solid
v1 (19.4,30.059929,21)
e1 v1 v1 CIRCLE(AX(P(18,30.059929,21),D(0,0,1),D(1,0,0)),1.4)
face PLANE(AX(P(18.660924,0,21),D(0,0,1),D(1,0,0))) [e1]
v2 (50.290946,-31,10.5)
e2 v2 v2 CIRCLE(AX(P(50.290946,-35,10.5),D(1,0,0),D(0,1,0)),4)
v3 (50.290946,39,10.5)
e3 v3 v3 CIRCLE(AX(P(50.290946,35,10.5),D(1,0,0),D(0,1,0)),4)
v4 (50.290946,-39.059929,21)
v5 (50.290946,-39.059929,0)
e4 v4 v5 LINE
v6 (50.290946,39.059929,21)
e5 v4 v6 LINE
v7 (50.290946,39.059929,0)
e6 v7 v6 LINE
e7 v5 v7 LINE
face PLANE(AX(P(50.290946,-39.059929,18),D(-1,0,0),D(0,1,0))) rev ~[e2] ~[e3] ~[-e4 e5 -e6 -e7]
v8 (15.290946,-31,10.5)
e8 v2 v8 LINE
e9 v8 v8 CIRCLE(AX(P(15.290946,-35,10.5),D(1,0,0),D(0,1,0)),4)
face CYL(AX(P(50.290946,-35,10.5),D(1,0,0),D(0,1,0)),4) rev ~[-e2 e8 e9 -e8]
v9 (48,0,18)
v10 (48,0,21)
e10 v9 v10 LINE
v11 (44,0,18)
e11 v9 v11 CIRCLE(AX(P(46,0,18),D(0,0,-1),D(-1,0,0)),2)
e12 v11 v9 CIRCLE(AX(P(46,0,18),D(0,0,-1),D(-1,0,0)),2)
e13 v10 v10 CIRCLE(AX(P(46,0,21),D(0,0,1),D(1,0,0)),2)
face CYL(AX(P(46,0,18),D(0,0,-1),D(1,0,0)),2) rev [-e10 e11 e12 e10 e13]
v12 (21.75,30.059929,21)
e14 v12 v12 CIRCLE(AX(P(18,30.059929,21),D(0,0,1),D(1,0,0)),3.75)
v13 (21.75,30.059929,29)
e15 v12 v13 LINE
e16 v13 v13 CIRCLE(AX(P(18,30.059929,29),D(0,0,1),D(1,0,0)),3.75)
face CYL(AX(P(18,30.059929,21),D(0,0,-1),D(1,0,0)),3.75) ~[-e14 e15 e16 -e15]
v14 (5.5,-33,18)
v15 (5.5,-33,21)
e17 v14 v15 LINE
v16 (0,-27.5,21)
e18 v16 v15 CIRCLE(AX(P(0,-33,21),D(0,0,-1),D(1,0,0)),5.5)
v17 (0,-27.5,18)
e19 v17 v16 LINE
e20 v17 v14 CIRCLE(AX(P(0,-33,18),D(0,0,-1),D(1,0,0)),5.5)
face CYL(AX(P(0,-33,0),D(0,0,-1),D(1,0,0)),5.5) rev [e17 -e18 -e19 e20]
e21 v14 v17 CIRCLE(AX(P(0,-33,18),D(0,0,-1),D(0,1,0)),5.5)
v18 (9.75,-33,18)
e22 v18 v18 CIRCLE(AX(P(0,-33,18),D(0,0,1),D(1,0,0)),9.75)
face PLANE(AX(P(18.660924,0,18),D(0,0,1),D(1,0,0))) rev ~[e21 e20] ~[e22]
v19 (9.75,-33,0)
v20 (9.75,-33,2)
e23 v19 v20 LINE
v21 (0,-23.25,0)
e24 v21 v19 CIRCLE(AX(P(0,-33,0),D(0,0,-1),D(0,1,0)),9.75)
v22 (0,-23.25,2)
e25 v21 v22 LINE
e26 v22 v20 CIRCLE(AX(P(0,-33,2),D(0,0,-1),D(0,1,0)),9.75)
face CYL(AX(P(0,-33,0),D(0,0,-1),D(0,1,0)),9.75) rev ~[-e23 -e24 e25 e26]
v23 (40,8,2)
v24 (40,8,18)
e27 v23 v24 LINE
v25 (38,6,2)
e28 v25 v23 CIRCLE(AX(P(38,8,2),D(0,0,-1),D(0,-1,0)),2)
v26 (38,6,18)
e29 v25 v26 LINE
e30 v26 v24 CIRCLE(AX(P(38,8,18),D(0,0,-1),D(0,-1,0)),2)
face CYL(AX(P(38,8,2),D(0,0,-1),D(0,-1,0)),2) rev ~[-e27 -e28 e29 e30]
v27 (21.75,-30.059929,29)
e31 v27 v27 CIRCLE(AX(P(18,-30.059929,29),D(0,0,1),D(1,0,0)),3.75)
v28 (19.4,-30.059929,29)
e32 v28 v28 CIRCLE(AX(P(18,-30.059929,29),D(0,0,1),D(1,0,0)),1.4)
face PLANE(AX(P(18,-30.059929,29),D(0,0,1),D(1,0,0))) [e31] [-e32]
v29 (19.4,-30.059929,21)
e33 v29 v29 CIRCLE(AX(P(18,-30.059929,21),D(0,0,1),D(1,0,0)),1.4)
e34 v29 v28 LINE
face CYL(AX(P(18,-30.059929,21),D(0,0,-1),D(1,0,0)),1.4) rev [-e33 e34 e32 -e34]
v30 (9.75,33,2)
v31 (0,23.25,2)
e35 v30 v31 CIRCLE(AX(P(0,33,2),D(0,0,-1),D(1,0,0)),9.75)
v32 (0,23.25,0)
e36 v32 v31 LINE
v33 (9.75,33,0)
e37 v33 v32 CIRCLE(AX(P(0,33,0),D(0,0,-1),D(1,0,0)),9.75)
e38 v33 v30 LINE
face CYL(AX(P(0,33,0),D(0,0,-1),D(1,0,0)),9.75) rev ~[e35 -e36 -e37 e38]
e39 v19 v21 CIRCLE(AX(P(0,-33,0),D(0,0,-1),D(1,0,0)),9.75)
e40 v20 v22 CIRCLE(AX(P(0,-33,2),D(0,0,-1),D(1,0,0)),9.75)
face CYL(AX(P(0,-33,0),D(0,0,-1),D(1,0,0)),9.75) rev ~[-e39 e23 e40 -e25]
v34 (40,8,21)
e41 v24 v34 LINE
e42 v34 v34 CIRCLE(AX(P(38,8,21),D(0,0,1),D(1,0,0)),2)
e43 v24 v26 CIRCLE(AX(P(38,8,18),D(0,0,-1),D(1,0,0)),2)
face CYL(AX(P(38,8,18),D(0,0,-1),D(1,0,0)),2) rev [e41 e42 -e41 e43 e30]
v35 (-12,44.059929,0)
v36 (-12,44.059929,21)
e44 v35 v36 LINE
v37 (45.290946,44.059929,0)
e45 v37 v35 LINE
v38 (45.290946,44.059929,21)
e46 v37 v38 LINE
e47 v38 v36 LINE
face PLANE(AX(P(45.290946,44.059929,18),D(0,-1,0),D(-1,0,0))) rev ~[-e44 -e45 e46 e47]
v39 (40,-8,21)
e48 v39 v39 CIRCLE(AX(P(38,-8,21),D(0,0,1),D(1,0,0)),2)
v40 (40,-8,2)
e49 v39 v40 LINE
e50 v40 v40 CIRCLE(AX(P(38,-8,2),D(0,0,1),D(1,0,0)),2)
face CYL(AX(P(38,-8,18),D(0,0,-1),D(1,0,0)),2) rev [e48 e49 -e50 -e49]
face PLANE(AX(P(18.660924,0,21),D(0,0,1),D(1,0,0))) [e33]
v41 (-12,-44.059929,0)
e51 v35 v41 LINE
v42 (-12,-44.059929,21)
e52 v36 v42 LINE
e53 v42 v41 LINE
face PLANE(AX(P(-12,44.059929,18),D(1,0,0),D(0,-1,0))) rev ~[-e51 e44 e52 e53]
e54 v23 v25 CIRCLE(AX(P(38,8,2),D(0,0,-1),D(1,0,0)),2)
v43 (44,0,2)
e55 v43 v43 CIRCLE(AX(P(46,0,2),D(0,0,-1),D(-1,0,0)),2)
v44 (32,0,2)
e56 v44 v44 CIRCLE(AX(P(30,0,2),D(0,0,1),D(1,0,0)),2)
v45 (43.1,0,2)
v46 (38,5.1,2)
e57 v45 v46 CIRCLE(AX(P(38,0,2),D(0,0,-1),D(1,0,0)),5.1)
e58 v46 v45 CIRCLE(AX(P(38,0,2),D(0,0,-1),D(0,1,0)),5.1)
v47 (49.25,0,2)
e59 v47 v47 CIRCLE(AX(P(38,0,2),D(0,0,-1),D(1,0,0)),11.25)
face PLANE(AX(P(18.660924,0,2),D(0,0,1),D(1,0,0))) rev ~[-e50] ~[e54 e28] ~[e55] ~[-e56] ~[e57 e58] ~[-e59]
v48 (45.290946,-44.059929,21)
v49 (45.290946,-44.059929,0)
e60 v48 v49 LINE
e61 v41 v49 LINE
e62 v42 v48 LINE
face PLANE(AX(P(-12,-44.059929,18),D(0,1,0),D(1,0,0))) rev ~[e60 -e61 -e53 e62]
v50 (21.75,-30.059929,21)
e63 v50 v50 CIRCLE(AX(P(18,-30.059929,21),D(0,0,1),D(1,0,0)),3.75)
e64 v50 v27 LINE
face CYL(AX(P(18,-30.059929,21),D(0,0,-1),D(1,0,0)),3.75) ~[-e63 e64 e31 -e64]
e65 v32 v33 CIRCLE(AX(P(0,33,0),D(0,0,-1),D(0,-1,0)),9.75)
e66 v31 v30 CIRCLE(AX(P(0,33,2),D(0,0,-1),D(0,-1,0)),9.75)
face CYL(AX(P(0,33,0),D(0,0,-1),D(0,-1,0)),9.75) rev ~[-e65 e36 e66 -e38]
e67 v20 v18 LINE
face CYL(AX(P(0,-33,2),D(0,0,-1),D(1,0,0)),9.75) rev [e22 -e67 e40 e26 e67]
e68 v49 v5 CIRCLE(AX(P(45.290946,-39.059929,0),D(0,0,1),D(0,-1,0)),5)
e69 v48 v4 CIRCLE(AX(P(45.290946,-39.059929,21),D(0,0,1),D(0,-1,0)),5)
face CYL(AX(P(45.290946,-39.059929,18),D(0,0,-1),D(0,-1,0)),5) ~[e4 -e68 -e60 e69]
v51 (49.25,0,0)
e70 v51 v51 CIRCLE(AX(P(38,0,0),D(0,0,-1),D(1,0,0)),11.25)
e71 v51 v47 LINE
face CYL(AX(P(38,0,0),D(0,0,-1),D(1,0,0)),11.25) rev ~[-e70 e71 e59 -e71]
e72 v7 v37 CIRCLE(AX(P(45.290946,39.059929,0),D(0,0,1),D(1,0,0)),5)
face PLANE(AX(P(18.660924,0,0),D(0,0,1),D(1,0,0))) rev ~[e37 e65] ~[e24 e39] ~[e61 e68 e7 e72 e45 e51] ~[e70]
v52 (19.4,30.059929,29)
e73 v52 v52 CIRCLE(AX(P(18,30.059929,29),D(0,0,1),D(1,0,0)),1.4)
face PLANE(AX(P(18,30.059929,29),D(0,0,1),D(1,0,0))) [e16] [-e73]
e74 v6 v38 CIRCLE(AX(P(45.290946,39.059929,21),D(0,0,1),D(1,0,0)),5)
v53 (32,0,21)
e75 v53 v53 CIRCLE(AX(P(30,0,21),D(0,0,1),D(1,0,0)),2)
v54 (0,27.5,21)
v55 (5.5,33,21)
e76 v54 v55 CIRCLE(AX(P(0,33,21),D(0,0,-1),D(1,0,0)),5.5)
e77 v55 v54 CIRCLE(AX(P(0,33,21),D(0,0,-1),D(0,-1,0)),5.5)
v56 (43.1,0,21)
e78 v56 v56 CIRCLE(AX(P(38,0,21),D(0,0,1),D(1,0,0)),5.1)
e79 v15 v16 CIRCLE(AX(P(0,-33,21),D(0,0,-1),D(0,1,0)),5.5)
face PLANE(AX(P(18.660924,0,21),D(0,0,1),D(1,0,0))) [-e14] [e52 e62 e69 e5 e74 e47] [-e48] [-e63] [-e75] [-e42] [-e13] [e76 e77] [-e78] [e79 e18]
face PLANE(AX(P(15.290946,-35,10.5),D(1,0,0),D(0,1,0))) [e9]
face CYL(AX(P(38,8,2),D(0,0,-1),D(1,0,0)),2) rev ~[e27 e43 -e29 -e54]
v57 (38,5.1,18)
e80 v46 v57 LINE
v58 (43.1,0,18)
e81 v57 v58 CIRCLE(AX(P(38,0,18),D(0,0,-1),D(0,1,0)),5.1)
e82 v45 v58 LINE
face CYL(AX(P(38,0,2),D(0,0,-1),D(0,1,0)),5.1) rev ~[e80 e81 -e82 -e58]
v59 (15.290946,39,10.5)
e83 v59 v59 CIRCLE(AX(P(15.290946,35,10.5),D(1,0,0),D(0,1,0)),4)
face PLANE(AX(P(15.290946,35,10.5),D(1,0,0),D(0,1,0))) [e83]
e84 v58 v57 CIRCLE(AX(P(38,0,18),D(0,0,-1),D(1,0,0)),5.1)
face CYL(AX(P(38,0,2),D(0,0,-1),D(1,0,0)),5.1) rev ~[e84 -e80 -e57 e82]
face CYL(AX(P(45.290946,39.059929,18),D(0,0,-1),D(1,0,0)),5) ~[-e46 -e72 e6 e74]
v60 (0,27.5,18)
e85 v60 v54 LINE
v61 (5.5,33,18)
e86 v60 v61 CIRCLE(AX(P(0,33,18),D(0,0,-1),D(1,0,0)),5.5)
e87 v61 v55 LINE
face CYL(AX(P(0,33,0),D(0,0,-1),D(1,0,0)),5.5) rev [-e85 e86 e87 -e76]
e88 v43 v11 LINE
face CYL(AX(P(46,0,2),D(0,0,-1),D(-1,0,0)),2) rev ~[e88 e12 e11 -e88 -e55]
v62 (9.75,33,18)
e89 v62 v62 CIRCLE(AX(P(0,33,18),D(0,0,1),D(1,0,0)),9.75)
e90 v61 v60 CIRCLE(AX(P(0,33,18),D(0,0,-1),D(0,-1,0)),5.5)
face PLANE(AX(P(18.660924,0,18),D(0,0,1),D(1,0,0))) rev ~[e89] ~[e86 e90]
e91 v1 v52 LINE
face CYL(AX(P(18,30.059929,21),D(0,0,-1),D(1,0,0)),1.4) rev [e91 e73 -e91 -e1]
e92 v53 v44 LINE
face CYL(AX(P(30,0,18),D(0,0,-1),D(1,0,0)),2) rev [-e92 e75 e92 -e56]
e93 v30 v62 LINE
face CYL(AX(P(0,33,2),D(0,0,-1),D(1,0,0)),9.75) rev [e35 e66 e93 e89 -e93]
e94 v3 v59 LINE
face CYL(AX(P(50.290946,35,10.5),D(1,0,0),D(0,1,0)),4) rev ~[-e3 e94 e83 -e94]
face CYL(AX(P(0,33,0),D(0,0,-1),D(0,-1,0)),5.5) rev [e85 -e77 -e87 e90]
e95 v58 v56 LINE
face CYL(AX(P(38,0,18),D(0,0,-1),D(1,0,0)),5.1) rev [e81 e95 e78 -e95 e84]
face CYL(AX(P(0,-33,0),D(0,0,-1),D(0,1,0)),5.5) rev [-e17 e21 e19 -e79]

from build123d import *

# Parameters (mm, degrees)
F1_DEPTH  = 2
F2_R      = 9.75
F2_R_2    = 11.25
F2_R_3    = 2
F3_DEPTH  = 16
F4_R      = 9.75
F4_R_2    = 2
F4_R_3    = 5.1
F5_DEPTH  = 3
F7_DEPTH  = 40
F6_R      = 4
F8_DEPTH  = 35
F9_R      = 3.75
F9_R_2    = 1.4
F10_DEPTH = 8


# Not quite as in the source:
# - after a boolean that leaves OpenCascade's solid faulty, fix() repairs it
# - a feature names something its author has since deleted; it is built from what else it names


with BuildPart() as f1:
    # F0 (on Top) → F1 (new body)
    with BuildSketch(Plane.XY):
        with BuildLine():
            Line((50.2909459174, -23.5600714934), (50.2909459174, 23.5599285066))
            Line((50.2909459174, 23.5599285066), (50.2909459174, 39.0599285066))
            ThreePointArc((50.2909459174, 39.0599285066), (48.8264798233, 42.5954624125), (45.2909459174, 44.0599285066))
            Line((45.2909459174, 44.0599285066), (-12, 44.0599285066))
            Line((-12, 44.0599285066), (-12, 0))
            Line((-12, 0), (-12, -44.0599285066))
            Line((-12, -44.0599285066), (45.2909459174, -44.0599285066))
            ThreePointArc((45.2909459174, -44.0599285066), (48.8264798233, -42.5954624125), (50.2909459174, -39.0599285066))
            Line((50.2909459174, -39.0599285066), (50.2909459174, -23.5600714934))
        make_face()
        with BuildLine():
            ThreePointArc((9.75, -33), (-6.8942911166, -39.8942911166), (0, -23.25))
            ThreePointArc((0, -23.25), (6.8942911166, -26.1057088834), (9.75, -33))
        make_face(mode=Mode.SUBTRACT)
        with BuildLine():
            ThreePointArc((9.75, 33), (6.8942911166, 26.1057088834), (0, 23.25))
            ThreePointArc((0, 23.25), (-6.8942911166, 39.8942911166), (9.75, 33))
        make_face(mode=Mode.SUBTRACT)
        with BuildLine():
            ThreePointArc((26.75, 0), (38, 11.25), (49.25, 0))
            ThreePointArc((49.25, 0), (38, -11.25), (26.75, 0))
        make_face(mode=Mode.SUBTRACT)
    extrude(amount=F1_DEPTH)

    # F2 (on face) → F3 (join)
    with BuildSketch(Plane.XY.offset(2)):
        with BuildLine():
            ThreePointArc((50.2909459174, 39.0599285066), (48.8264798233, 42.5954624125), (45.2909459174, 44.0599285066))
            Line((45.2909459174, 44.0599285066), (-12, 44.0599285066))
            Line((-12, 44.0599285066), (-12, -44.0599285066))
            Line((-12, -44.0599285066), (45.2909459174, -44.0599285066))
            ThreePointArc((45.2909459174, -44.0599285066), (48.8264798233, -42.5954624125), (50.2909459174, -39.0599285066))
            Line((50.2909459174, -39.0599285066), (50.2909459174, 39.0599285066))
        make_face()
        with Locations((0, -33)):
            Circle(F2_R, mode=Mode.SUBTRACT)
        with Locations((0, 33)):
            Circle(F2_R, mode=Mode.SUBTRACT)
        with Locations((38, 0)):
            Circle(F2_R_2, mode=Mode.SUBTRACT)
        with Locations((38, 0)):
            Circle(F2_R_2)
        with Locations((38, -8)):
            Circle(F2_R_3, mode=Mode.SUBTRACT)
        with Locations((30, 0)):
            Circle(F2_R_3, mode=Mode.SUBTRACT)
        with BuildLine():
            ThreePointArc((38, 5.1), (41.6062445841, 3.6062445841), (43.1, 0))
            ThreePointArc((43.1, 0), (34.3937554159, -3.6062445841), (38, 5.1))
        make_face(mode=Mode.SUBTRACT)
        with BuildLine():
            ThreePointArc((40, 8), (39.4142135624, 6.5857864376), (38, 6))
            ThreePointArc((38, 6), (36.5857864376, 9.4142135624), (40, 8))
        make_face(mode=Mode.SUBTRACT)
        with BuildLine():
            ThreePointArc((48, 0), (46, -2), (44, 0))
            ThreePointArc((44, 0), (46, 2), (48, 0))
        make_face(mode=Mode.SUBTRACT)
    extrude(amount=F3_DEPTH)

    # F4 (on face) → F5 (join)
    with BuildSketch(Plane.XY.offset(18)):
        with BuildLine():
            Line((50.2909459174, -39.0599285066), (50.2909459174, 39.0599285066))
            ThreePointArc((50.2909459174, 39.0599285066), (48.8264798233, 42.5954624125), (45.2909459174, 44.0599285066))
            Line((45.2909459174, 44.0599285066), (-12, 44.0599285066))
            Line((-12, 44.0599285066), (-12, -44.0599285066))
            Line((-12, -44.0599285066), (45.2909459174, -44.0599285066))
            ThreePointArc((45.2909459174, -44.0599285066), (48.8264798233, -42.5954624125), (50.2909459174, -39.0599285066))
        make_face()
        with Locations((0, -33)):
            Circle(F4_R, mode=Mode.SUBTRACT)
        with Locations((38, -8)):
            Circle(F4_R_2, mode=Mode.SUBTRACT)
        with Locations((0, 33)):
            Circle(F4_R, mode=Mode.SUBTRACT)
        with Locations((30, 0)):
            Circle(F4_R_2, mode=Mode.SUBTRACT)
        with Locations((38, 0)):
            Circle(F4_R_3, mode=Mode.SUBTRACT)
        with Locations((38, 8)):
            Circle(F4_R_2, mode=Mode.SUBTRACT)
        with Locations((46, 0)):
            Circle(F4_R_2, mode=Mode.SUBTRACT)
        with Locations((0, -33)):
            Circle(F4_R)
        with Locations((0, 33)):
            Circle(F4_R)
    extrude(amount=F5_DEPTH)

    # F0 (on Top) → F7 (cut)
    with BuildSketch(Plane.XY):
        with BuildLine():
            ThreePointArc((5.5, -33), (3.8890872965, -29.1109127035), (0, -27.5))
            ThreePointArc((0, -27.5), (-3.8890872965, -36.8890872965), (5.5, -33))
        make_face()
        with BuildLine():
            ThreePointArc((5.5, 33), (-3.8890872965, 36.8890872965), (0, 27.5))
            ThreePointArc((0, 27.5), (3.8890872965, 29.1109127035), (5.5, 33))
        make_face()
    extrude(amount=F7_DEPTH, mode=Mode.SUBTRACT)

    add(f1.part.fix(), mode=Mode.REPLACE)

    # F6 (on face) → F8 (cut)
    with BuildSketch(Plane.YZ.offset(50.2909459174)):
        with Locations((35, 10.5)):
            Circle(F6_R)
        with Locations((-35, 10.5)):
            Circle(F6_R)
    extrude(amount=-F8_DEPTH, mode=Mode.SUBTRACT)

    # F9 (on face) → F10 (join)
    with BuildSketch(Plane.XY.offset(21)):
        with Locations((18, -30.0599285066)):
            Circle(F9_R)
        with Locations((18, -30.0599285066)):
            Circle(F9_R_2, mode=Mode.SUBTRACT)
        with Locations((18, 30.0599285066)):
            Circle(F9_R)
        with Locations((18, 30.0599285066)):
            Circle(F9_R_2, mode=Mode.SUBTRACT)
    extrude(amount=F10_DEPTH)


solid = f1.part
